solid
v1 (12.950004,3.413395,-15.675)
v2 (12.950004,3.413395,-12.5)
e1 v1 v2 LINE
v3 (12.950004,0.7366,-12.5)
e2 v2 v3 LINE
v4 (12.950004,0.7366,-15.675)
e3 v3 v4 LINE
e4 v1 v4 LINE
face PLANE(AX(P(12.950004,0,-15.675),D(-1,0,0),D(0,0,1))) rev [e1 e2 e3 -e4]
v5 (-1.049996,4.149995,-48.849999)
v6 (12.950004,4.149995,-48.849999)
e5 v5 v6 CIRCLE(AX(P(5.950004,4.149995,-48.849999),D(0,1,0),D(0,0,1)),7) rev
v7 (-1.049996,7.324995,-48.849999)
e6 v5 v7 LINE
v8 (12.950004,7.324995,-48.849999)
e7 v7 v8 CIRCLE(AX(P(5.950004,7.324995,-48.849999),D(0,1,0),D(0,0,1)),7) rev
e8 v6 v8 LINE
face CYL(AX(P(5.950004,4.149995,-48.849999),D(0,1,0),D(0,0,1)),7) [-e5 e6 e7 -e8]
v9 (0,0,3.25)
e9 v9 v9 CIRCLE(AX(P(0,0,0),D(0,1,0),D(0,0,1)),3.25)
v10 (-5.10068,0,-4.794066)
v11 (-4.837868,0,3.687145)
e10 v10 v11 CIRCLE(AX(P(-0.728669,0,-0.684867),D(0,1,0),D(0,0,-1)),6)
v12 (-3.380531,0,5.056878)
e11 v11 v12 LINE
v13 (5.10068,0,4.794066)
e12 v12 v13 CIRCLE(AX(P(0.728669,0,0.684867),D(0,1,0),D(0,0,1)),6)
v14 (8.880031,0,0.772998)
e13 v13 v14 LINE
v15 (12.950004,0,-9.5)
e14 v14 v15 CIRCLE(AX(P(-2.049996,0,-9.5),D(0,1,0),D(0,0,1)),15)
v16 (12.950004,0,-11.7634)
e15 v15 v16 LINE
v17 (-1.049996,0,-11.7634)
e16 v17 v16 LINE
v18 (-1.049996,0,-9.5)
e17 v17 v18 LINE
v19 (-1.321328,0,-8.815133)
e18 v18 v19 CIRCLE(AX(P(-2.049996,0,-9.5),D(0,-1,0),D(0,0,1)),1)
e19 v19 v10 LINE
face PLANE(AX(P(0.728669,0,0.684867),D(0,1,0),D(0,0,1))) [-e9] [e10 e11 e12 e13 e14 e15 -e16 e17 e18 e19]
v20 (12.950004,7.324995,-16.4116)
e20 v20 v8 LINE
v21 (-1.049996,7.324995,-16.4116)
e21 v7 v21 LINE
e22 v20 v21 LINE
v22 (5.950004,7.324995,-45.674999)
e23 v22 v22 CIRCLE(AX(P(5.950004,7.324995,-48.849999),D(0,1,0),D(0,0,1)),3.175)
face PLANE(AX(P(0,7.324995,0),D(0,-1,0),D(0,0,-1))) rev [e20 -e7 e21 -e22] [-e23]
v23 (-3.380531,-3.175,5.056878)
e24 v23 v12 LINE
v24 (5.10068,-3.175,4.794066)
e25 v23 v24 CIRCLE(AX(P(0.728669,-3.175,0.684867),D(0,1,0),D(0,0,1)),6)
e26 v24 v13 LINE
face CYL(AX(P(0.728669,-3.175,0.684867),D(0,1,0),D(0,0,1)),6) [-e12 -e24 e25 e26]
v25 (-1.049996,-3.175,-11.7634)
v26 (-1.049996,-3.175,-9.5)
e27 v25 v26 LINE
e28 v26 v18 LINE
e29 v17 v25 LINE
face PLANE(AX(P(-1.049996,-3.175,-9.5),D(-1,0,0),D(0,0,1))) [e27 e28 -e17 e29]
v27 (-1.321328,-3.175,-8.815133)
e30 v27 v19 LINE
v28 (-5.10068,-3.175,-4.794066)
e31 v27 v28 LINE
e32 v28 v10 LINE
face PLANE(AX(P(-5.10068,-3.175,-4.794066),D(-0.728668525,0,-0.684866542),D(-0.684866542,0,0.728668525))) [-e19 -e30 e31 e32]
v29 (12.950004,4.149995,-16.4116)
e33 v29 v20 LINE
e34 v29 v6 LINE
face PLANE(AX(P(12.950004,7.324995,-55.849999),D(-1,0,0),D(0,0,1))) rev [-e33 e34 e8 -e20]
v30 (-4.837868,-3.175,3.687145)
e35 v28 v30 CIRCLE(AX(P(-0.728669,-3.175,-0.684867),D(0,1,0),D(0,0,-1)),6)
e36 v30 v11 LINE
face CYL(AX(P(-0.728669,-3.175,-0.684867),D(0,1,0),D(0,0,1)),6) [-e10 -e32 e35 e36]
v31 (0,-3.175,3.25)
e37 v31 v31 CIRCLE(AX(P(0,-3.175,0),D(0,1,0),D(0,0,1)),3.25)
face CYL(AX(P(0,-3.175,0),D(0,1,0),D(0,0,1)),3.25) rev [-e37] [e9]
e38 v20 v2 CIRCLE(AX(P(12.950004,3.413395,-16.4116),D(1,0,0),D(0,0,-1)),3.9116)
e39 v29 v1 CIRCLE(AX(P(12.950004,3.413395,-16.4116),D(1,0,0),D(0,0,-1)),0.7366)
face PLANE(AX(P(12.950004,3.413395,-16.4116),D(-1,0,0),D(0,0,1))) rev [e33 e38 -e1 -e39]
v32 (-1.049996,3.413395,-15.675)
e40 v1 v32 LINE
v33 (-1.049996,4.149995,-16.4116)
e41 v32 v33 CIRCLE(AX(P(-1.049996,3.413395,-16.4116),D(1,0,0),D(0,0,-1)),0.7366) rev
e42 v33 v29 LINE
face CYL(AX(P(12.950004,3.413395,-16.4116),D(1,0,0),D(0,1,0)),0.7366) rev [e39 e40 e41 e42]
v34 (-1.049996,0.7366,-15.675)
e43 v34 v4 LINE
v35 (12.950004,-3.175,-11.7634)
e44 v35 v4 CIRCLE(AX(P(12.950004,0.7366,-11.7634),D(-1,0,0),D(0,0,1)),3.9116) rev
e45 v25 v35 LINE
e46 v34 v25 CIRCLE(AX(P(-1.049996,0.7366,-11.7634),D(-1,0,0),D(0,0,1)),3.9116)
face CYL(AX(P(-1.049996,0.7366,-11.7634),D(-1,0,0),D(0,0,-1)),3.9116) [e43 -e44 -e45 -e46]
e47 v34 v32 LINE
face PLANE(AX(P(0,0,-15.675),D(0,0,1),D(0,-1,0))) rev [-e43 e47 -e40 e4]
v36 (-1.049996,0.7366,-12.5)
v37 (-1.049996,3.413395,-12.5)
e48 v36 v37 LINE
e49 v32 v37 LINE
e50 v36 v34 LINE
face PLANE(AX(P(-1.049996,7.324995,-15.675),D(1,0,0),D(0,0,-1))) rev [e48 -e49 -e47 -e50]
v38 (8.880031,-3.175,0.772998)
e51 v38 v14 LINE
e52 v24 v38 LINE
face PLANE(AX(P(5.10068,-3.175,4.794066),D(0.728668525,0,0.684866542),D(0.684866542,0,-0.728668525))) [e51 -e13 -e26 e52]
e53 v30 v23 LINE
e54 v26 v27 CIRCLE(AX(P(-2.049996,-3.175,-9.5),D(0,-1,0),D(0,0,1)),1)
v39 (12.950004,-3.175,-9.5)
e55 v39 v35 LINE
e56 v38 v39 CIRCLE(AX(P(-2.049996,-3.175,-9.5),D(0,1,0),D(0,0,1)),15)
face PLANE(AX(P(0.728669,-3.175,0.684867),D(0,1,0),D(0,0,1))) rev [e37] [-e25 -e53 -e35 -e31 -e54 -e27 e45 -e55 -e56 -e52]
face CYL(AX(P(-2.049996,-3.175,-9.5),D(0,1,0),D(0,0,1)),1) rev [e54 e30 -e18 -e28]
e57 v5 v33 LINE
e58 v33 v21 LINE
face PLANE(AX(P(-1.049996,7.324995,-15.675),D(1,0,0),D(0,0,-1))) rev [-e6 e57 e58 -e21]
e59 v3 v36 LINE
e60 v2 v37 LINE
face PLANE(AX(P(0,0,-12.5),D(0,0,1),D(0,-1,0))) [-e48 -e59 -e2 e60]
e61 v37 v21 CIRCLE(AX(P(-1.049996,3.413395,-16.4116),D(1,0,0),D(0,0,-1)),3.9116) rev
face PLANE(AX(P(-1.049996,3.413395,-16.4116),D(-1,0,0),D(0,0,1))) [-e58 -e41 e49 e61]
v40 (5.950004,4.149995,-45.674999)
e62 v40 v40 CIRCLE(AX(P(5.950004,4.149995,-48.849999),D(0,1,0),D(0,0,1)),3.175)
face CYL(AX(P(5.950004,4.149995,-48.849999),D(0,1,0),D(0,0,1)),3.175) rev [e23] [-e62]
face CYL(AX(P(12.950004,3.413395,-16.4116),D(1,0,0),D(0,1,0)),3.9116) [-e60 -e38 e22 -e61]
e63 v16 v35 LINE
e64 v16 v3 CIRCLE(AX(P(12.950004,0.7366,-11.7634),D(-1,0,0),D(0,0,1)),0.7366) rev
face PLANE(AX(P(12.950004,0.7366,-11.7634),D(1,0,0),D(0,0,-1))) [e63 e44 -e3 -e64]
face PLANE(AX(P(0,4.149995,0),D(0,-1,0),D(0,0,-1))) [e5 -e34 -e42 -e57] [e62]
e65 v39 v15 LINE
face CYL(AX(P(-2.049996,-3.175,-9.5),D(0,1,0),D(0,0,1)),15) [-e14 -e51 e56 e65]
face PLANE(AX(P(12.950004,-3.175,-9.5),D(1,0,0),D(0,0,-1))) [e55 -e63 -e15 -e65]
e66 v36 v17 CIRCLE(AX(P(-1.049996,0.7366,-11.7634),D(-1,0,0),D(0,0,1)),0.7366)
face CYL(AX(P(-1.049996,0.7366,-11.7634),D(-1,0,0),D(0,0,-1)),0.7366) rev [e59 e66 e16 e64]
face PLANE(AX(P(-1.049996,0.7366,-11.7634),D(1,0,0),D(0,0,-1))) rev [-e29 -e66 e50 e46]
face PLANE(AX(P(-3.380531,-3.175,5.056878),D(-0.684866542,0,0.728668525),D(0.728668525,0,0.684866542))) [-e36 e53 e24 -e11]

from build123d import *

# Parameters (mm, degrees)
SKETCH1_R                    = 3.25
BASE_FLANGE1_DEPTH           = 3.175
EDGE_FLANGE1_STRIP_W         = 14.1732
EDGE_FLANGE1_STRIP_H         = 3.175
EDGE_FLANGE1_STRIP_CUT_DEPTH = 14
EDGE_FLANGE1_DEPTH           = 14
EDGE_FLANGE2_STRIP_W         = 14.1732
EDGE_FLANGE2_STRIP_H         = 3.175
EDGE_FLANGE2_STRIP_CUT_DEPTH = 14
EDGE_FLANGE2_DEPTH           = 14
SKETCH17_R                   = 3.175
CUT_EXTRUDE1_DEPTH           = 3.175


# Sheet-metal steps are written as plain solids
with BuildPart() as part:
    # Sketch1 → Base-Flange1 (new body)
    with BuildSketch(Plane(origin=(0, 0, 0), x_dir=(1, 0, 0), z_dir=(0, 1, 0))):
        with BuildLine():
            Line((12.950003607, 12.5), (-1.049996393, 12.5))
            Line((-1.049996393, 12.5), (-1.049996393, 9.5))
            ThreePointArc((-1.049996393, 9.5), (-1.120300603, 9.131671699), (-1.321327868, 8.815133458))
            Line((-1.321327868, 8.815133458), (-5.100679674, 4.794065797))
            ThreePointArc((-5.100679674, 4.794065797), (-6.725789914, 0.499030469), (-4.837867779, -3.687144607))
            Line((-4.837867779, -3.687144607), (-3.380530729, -5.056877692))
            ThreePointArc((-3.380530729, -5.056877692), (0.914504598, -6.681987931), (5.100679674, -4.794065797))
            Line((5.100679674, -4.794065797), (8.88003148, -0.772998135))
            ThreePointArc((8.88003148, -0.772998135), (11.895440461, 3.97507548), (12.950003607, 9.5))
            Line((12.950003607, 9.5), (12.950003607, 12.5))
        make_face()
        with Locations(Location((0, 0, 0), (0, 0, 270))):
            Circle(SKETCH1_R, mode=Mode.SUBTRACT)
    extrude(amount=-BASE_FLANGE1_DEPTH)

    # Edge-Flange1 strip (across the edge) → Edge-Flange1 strip cut (cut)
    with BuildSketch(Plane(origin=(12.950003607, 0, -12.5), x_dir=(0, 0, 1), z_dir=(-1, 0, 0))):
        with Locations((-6.35, -1.5875)):
            Rectangle(EDGE_FLANGE1_STRIP_W, EDGE_FLANGE1_STRIP_H)
    extrude(amount=EDGE_FLANGE1_STRIP_CUT_DEPTH, mode=Mode.SUBTRACT)

    # Edge-Flange1 section (across the edge) → Edge-Flange1 (add)
    with BuildSketch(Plane(origin=(12.950003607, 0, -12.5), x_dir=(0, 0, 1), z_dir=(-1, 0, 0))):
        with BuildLine():
            Line((-3.175, 0.7366), (-3.175, 7.324994814))
            Line((-3.175, 7.324994814), (0, 7.324994814))
            Line((0, 7.324994814), (0, 0.7366))
            ThreePointArc((0, 0.7366), (0.215745145, 0.215745145), (0.7366, 0))
            Line((0.7366, 0), (0.7366, -3.175))
            ThreePointArc((0.7366, -3.175), (-2.029318885, -2.029318885), (-3.175, 0.7366))
        make_face()
    extrude(amount=EDGE_FLANGE1_DEPTH)

    # Edge-Flange2 strip (across the edge) → Edge-Flange2 strip cut (cut)
    with BuildSketch(Plane(origin=(-1.049996393, 7.324994814, -15.675), x_dir=(0, -1, 0), z_dir=(1, 0, 0))):
        with Locations((-3.175, -1.5875)):
            Rectangle(EDGE_FLANGE2_STRIP_W, EDGE_FLANGE2_STRIP_H)
    extrude(amount=EDGE_FLANGE2_STRIP_CUT_DEPTH, mode=Mode.SUBTRACT)

    # Edge-Flange2 section (across the edge) → Edge-Flange2 (add)
    with BuildSketch(Plane(origin=(-1.049996393, 7.324994814, -15.675), x_dir=(0, -1, 0), z_dir=(1, 0, 0))):
        with BuildLine():
            Line((0, 0.7366), (0, 40.174998631))
            Line((0, 40.174998631), (3.175, 40.174998631))
            Line((3.175, 40.174998631), (3.175, 0.7366))
            ThreePointArc((3.175, 0.7366), (3.390745145, 0.215745145), (3.9116, 0))
            Line((3.9116, 0), (3.9116, -3.175))
            ThreePointArc((3.9116, -3.175), (1.145681115, -2.029318885), (0, 0.7366))
        make_face()
    extrude(amount=EDGE_FLANGE2_DEPTH)

    # Sketch17 → Cut-Extrude1 (cut)
    with BuildSketch(Plane(origin=(0, 7.324994814, 0), x_dir=(1, 0, 0), z_dir=(0, 1, 0))):
        with BuildLine():
            ThreePointArc((-1.049996393, 48.849998631), (1.000256139, 53.7997461), (5.950003607, 55.849998631))
            Line((5.950003607, 55.849998631), (-1.049996393, 55.849998631))
            Line((-1.049996393, 55.849998631), (-1.049996393, 48.849998631))
        make_face()
        with BuildLine():
            ThreePointArc((5.950003607, 55.849998631), (10.899751075, 53.7997461), (12.950003607, 48.849998631))
            Line((12.950003607, 48.849998631), (12.950003607, 55.849998631))
            Line((12.950003607, 55.849998631), (5.950003607, 55.849998631))
        make_face()
        with Locations(Location((5.950003607, 48.849998631, 0), (0, 0, 270))):
            Circle(SKETCH17_R)
    extrude(amount=-CUT_EXTRUDE1_DEPTH, mode=Mode.SUBTRACT)


solid = part.part
